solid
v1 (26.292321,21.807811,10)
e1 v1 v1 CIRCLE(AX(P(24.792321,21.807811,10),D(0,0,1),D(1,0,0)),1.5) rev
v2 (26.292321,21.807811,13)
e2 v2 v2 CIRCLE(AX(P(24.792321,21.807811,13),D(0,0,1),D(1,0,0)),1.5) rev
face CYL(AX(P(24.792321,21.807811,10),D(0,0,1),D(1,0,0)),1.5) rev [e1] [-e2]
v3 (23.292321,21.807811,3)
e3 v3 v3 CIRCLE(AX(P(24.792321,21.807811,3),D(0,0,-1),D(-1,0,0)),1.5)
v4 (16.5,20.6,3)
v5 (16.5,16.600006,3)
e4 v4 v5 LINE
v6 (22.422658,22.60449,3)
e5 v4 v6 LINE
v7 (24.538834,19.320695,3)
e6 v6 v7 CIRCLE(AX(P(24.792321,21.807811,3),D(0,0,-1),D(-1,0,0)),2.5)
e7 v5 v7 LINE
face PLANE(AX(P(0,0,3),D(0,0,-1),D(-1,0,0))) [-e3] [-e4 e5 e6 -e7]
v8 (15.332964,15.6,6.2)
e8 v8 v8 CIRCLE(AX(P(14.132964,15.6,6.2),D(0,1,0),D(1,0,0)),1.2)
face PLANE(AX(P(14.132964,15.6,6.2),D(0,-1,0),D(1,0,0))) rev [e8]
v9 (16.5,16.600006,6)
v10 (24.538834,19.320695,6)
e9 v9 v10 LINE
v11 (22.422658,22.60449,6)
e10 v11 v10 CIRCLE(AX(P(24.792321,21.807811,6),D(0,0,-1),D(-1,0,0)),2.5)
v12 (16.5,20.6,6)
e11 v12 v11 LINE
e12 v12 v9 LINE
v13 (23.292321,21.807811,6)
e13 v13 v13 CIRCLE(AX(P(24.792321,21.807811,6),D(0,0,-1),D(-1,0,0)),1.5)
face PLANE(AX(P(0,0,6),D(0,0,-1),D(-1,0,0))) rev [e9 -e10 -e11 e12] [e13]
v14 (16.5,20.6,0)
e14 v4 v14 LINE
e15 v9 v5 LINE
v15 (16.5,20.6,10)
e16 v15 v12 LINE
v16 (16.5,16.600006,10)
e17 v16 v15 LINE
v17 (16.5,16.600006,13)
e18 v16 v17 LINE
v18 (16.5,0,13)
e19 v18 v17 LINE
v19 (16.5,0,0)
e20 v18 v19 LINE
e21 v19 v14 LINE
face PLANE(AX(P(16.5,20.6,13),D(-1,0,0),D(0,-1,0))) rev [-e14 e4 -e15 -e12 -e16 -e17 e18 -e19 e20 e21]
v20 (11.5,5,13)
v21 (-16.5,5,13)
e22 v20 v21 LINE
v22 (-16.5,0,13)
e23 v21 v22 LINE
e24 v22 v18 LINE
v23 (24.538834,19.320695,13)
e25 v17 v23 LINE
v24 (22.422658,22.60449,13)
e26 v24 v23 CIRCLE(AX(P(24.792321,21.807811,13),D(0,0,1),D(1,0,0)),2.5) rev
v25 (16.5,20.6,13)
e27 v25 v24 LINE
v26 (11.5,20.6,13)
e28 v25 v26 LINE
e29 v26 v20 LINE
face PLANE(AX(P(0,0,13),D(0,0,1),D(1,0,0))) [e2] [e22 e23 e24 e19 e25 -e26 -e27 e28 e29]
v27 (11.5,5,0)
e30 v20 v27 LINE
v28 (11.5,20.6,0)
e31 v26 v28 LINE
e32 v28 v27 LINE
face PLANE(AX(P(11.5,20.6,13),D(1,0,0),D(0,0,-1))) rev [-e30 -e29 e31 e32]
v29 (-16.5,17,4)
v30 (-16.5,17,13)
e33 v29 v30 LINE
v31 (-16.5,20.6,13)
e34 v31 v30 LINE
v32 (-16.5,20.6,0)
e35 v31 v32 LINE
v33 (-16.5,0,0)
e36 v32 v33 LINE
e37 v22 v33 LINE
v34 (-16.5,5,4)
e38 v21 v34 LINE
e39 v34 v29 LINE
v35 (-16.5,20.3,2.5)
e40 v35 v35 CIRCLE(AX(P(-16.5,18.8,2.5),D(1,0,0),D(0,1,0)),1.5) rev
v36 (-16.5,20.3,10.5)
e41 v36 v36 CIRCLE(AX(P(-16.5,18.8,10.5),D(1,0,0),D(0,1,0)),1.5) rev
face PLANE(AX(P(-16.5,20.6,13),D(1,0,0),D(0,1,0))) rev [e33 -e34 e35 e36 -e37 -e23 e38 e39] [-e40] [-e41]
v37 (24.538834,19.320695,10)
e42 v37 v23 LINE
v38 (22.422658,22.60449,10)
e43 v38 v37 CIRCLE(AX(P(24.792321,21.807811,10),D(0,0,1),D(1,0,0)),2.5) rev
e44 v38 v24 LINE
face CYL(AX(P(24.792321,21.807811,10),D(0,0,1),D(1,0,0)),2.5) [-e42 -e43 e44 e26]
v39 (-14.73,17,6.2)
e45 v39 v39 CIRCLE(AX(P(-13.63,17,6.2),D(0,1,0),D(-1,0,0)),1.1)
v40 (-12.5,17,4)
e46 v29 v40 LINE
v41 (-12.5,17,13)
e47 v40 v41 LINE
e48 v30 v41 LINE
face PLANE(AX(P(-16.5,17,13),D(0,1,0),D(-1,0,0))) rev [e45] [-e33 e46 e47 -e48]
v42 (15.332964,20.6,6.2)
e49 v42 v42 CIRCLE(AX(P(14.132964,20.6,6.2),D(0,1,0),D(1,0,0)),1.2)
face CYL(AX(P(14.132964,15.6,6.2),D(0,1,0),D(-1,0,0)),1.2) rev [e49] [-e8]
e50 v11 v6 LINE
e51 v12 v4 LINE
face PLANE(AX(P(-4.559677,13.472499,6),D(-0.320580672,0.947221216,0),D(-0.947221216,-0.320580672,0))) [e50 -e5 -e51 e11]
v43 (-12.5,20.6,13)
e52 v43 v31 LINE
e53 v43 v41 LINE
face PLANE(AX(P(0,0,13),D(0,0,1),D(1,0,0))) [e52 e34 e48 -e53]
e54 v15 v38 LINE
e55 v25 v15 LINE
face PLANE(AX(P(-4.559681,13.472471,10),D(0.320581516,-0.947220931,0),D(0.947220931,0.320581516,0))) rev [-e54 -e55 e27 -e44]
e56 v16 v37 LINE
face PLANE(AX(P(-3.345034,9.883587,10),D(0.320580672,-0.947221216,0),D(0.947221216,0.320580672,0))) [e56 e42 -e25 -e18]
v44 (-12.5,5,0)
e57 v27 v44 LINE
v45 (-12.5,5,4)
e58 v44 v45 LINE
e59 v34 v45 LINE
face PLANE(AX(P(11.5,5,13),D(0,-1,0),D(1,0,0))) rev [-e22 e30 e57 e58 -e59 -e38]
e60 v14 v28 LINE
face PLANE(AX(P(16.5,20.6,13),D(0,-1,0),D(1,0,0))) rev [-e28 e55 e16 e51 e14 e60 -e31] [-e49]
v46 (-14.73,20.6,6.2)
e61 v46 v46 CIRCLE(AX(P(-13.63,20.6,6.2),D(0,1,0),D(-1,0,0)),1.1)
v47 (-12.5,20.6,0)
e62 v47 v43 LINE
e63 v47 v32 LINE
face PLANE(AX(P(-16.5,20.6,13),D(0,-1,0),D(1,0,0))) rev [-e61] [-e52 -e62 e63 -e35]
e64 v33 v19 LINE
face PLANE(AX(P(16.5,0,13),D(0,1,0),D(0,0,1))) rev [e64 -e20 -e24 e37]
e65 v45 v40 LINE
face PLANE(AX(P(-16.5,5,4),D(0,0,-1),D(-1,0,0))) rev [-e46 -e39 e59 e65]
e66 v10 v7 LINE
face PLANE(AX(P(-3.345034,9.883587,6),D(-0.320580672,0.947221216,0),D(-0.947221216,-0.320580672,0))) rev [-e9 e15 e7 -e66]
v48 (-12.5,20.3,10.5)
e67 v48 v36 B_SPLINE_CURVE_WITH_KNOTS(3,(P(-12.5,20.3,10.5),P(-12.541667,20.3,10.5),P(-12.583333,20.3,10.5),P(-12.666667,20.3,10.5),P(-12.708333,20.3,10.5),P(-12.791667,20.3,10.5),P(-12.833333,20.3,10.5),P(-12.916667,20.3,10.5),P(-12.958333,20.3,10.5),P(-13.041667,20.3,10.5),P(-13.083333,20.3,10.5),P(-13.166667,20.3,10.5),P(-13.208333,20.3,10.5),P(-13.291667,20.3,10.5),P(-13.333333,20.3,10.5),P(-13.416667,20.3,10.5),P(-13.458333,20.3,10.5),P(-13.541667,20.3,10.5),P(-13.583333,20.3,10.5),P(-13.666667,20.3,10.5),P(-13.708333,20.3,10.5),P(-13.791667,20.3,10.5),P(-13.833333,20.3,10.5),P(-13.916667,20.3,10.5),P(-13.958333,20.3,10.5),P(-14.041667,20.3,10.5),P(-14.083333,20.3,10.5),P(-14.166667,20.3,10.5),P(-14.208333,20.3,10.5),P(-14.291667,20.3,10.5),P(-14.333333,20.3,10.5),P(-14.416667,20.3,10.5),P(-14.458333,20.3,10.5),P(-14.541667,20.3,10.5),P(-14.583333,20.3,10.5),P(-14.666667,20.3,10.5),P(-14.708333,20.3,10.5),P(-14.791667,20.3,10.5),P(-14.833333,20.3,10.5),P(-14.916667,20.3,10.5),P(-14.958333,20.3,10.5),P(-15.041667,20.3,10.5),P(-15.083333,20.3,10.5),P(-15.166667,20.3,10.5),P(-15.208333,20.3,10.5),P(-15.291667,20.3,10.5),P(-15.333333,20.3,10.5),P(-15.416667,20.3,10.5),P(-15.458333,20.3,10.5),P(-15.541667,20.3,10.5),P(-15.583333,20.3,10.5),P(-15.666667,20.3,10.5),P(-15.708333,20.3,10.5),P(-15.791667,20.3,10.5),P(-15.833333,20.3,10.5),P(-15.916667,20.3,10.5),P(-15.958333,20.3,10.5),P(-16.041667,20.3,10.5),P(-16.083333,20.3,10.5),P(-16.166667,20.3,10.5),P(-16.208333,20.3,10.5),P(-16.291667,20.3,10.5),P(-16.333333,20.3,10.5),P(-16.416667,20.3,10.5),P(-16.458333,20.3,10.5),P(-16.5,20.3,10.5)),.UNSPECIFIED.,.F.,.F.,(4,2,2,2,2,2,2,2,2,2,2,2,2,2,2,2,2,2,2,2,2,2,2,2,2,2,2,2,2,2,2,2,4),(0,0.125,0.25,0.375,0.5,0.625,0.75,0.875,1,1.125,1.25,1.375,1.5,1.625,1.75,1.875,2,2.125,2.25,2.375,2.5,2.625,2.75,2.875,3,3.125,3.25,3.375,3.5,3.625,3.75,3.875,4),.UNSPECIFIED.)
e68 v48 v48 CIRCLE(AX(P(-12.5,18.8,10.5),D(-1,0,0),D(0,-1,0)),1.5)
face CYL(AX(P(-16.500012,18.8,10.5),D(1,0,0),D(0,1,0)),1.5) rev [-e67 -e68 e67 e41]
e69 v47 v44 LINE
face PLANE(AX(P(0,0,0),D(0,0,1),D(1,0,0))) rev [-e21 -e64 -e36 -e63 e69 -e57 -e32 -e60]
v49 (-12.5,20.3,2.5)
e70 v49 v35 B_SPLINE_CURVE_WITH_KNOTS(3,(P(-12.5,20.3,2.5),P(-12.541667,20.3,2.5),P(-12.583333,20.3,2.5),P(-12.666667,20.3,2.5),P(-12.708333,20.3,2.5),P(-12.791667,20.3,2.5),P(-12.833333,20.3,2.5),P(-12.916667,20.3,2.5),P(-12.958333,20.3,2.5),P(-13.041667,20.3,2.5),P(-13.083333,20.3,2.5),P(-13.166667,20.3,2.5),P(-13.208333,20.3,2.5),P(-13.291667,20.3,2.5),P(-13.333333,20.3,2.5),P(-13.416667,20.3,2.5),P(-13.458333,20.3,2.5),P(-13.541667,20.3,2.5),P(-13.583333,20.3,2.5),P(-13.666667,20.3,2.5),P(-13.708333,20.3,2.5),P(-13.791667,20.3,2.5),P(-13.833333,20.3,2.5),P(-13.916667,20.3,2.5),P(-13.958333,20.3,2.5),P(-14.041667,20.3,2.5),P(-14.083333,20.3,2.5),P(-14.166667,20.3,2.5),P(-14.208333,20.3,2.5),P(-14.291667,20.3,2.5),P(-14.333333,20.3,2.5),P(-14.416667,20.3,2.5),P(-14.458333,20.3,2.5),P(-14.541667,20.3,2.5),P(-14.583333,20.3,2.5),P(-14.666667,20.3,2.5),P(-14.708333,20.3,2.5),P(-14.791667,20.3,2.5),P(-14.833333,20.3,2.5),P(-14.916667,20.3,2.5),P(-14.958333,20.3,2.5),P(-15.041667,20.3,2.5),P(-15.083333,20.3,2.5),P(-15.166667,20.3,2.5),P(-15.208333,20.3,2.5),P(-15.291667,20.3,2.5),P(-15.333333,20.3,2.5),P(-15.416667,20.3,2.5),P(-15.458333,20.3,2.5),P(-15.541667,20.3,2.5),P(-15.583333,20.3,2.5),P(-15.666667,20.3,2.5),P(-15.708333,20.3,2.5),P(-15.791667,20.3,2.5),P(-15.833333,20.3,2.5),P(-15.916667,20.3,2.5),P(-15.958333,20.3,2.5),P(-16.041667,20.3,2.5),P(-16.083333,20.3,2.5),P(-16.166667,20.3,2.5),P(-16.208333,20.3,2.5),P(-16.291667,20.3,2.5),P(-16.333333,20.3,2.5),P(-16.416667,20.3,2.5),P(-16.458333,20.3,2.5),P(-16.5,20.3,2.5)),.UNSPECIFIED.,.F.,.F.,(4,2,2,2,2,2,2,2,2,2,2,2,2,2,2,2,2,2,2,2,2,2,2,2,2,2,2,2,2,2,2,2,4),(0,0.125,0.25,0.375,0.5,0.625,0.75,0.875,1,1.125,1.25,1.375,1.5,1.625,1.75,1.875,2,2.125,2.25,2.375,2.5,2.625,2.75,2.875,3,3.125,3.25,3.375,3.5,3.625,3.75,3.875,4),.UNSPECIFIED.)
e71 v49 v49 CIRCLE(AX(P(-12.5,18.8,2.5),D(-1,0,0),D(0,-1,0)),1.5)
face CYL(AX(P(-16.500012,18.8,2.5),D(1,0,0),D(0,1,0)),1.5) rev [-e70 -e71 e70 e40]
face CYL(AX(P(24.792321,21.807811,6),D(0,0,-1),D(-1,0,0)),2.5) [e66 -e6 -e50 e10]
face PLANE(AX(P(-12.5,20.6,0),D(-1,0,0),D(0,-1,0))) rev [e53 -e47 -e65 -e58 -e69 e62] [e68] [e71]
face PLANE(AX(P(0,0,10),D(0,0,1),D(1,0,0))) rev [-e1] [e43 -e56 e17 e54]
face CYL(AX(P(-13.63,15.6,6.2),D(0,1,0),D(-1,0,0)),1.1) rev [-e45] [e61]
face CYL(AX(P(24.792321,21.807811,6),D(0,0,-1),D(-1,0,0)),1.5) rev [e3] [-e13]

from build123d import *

# Parameters (mm, degrees)
BOSS_EXTRUDE1_DEPTH            = 13
SKETCH2_W                      = 9
SKETCH2_H                      = 12
CUT_EXTRUDE1_DEPTH             = 5
SKETCH3_R                      = 1.1
SKETCH3_R_2                    = 1.2
CUT_EXTRUDE2_DEPTH             = 5
SKETCH4_R                      = 1.5
BOSS_EXTRUDE3_DEPTH            = 3
BOSS_EXTRUDE4_START            = -6
BOSS_EXTRUDE4_OUTLINE_R        = 1.5
BOSS_EXTRUDE4_DEPTH            = 3
CUT_EXTRUDE3_REACH             = 53.746
SKETCH9_R                      = 1.5
CUT_EXTRUDE3_DIRECTION_2_DEPTH = 52.745889594
SKETCH10_W                     = 1
SKETCH10_H                     = 15.6
CUT_EXTRUDE5_DEPTH             = 39.790984582


# Read off the part's stored shape, not the designer's step: Boss-Extrude4
with BuildPart() as part:
    # Sketch1 → Boss-Extrude1 (new body)
    with BuildSketch(Plane.XY):
        Polygon((-11.5, 0), (11.5, 0), (16.5, 0), (16.5, 20.6), (11.5, 20.6), (11.5, 5), (-11.5, 5), (-11.5, 20.6), (-16.5, 20.6), (-16.5, 0), align=None)
    extrude(amount=BOSS_EXTRUDE1_DEPTH)

    # Sketch2 → Cut-Extrude1 (cut)
    with BuildSketch(Plane(origin=(-11.5, 0, 0), x_dir=(0, 0, -1), z_dir=(1, 0, 0))):
        with Locations((-8.5, 11)):
            Rectangle(SKETCH2_W, SKETCH2_H)
    extrude(amount=-CUT_EXTRUDE1_DEPTH, mode=Mode.SUBTRACT)

    # Sketch3 → Cut-Extrude2 (cut)
    with BuildSketch(Plane(origin=(0, 20.6, 0), x_dir=(1, 0, 0), z_dir=(0, 1, 0))):
        with Locations(Location((-13.63, -6.2, 0), (0, 0, 180))):
            Circle(SKETCH3_R)
        with Locations((14.132964109, -6.2)):
            Circle(SKETCH3_R_2)
    extrude(amount=-CUT_EXTRUDE2_DEPTH, mode=Mode.SUBTRACT)

    # Sketch4 → Boss-Extrude3 (add)
    with BuildSketch(Plane.XY.offset(13)):
        with BuildLine():
            Line((22.42265834, 22.604489903), (16.5, 20.6))
            Line((16.5, 20.6), (16.5, 16.600005885))
            Line((16.5, 16.600005885), (24.538834173, 19.320695429))
            ThreePointArc((24.538834173, 19.320695429), (26.893762727, 23.162043036), (22.42265834, 22.604489903))
        make_face()
        with Locations((24.792321364, 21.807811077)):
            Circle(SKETCH4_R, mode=Mode.SUBTRACT)
    extrude(amount=-BOSS_EXTRUDE3_DEPTH)

    # Boss-Extrude4 outline → Boss-Extrude4 (add)
    with BuildSketch(Plane(origin=(0, 0, 0), x_dir=(-1, 0, 0), z_dir=(0, 0, -1)).offset(BOSS_EXTRUDE4_START)):
        with BuildLine():
            Line((-16.499998213, 20.600005281), (-22.42265834, 22.604489903))
            ThreePointArc((-22.42265834, 22.604489903), (-26.893762727, 23.162043036), (-24.538834173, 19.320695429))
            Line((-24.538834173, 19.320695429), (-16.5, 16.600005885))
            Line((-16.5, 16.600005885), (-16.499998213, 20.600005281))
        make_face()
        with Locations((-24.792321364, 21.807811077)):
            Circle(BOSS_EXTRUDE4_OUTLINE_R, mode=Mode.SUBTRACT)
    extrude(amount=BOSS_EXTRUDE4_DEPTH)

    # Sketch9 → Cut-Extrude3 (cut, up to next)
    with BuildSketch(Plane.ZY.offset(16.5), mode=Mode.PRIVATE) as cut_extrude3_sk1:
        with Locations(Location((2.5, 18.8, 0), (0, 0, 90))):
            Circle(SKETCH9_R)
    cut_extrude3_tool1 = extrude(cut_extrude3_sk1.sketch, amount=-CUT_EXTRUDE3_REACH, mode=Mode.PRIVATE) & part.part
    # Sketch9 → Cut-Extrude3 (cut, up to next)
    with BuildSketch(Plane.ZY.offset(16.5), mode=Mode.PRIVATE) as cut_extrude3_sk2:
        with Locations(Location((10.5, 18.8, 0), (0, 0, 90))):
            Circle(SKETCH9_R)
    cut_extrude3_tool2 = extrude(cut_extrude3_sk2.sketch, amount=-CUT_EXTRUDE3_REACH, mode=Mode.PRIVATE) & part.part
    add(cut_extrude3_tool1.solids().sort_by_distance((-16.5, 18.8, 2.5))[0], mode=Mode.SUBTRACT)
    add(cut_extrude3_tool2.solids().sort_by_distance((-16.5, 18.8, 10.5))[0], mode=Mode.SUBTRACT)

    # Sketch9 → Cut-Extrude3 direction 2 (cut)
    with BuildSketch(Plane.ZY.offset(16.5)):
        with Locations(Location((2.5, 18.8, 0), (0, 0, 90))):
            Circle(SKETCH9_R)
        with Locations(Location((10.5, 18.8, 0), (0, 0, 90))):
            Circle(SKETCH9_R)
    extrude(amount=CUT_EXTRUDE3_DIRECTION_2_DEPTH, mode=Mode.SUBTRACT)

    # Sketch10 → Cut-Extrude5 (cut, through all)
    with BuildSketch(Plane.XY.offset(13)):
        with Locations((-12, 12.8)):
            Rectangle(SKETCH10_W, SKETCH10_H)
    extrude(amount=-CUT_EXTRUDE5_DEPTH, mode=Mode.SUBTRACT)


solid = part.part
